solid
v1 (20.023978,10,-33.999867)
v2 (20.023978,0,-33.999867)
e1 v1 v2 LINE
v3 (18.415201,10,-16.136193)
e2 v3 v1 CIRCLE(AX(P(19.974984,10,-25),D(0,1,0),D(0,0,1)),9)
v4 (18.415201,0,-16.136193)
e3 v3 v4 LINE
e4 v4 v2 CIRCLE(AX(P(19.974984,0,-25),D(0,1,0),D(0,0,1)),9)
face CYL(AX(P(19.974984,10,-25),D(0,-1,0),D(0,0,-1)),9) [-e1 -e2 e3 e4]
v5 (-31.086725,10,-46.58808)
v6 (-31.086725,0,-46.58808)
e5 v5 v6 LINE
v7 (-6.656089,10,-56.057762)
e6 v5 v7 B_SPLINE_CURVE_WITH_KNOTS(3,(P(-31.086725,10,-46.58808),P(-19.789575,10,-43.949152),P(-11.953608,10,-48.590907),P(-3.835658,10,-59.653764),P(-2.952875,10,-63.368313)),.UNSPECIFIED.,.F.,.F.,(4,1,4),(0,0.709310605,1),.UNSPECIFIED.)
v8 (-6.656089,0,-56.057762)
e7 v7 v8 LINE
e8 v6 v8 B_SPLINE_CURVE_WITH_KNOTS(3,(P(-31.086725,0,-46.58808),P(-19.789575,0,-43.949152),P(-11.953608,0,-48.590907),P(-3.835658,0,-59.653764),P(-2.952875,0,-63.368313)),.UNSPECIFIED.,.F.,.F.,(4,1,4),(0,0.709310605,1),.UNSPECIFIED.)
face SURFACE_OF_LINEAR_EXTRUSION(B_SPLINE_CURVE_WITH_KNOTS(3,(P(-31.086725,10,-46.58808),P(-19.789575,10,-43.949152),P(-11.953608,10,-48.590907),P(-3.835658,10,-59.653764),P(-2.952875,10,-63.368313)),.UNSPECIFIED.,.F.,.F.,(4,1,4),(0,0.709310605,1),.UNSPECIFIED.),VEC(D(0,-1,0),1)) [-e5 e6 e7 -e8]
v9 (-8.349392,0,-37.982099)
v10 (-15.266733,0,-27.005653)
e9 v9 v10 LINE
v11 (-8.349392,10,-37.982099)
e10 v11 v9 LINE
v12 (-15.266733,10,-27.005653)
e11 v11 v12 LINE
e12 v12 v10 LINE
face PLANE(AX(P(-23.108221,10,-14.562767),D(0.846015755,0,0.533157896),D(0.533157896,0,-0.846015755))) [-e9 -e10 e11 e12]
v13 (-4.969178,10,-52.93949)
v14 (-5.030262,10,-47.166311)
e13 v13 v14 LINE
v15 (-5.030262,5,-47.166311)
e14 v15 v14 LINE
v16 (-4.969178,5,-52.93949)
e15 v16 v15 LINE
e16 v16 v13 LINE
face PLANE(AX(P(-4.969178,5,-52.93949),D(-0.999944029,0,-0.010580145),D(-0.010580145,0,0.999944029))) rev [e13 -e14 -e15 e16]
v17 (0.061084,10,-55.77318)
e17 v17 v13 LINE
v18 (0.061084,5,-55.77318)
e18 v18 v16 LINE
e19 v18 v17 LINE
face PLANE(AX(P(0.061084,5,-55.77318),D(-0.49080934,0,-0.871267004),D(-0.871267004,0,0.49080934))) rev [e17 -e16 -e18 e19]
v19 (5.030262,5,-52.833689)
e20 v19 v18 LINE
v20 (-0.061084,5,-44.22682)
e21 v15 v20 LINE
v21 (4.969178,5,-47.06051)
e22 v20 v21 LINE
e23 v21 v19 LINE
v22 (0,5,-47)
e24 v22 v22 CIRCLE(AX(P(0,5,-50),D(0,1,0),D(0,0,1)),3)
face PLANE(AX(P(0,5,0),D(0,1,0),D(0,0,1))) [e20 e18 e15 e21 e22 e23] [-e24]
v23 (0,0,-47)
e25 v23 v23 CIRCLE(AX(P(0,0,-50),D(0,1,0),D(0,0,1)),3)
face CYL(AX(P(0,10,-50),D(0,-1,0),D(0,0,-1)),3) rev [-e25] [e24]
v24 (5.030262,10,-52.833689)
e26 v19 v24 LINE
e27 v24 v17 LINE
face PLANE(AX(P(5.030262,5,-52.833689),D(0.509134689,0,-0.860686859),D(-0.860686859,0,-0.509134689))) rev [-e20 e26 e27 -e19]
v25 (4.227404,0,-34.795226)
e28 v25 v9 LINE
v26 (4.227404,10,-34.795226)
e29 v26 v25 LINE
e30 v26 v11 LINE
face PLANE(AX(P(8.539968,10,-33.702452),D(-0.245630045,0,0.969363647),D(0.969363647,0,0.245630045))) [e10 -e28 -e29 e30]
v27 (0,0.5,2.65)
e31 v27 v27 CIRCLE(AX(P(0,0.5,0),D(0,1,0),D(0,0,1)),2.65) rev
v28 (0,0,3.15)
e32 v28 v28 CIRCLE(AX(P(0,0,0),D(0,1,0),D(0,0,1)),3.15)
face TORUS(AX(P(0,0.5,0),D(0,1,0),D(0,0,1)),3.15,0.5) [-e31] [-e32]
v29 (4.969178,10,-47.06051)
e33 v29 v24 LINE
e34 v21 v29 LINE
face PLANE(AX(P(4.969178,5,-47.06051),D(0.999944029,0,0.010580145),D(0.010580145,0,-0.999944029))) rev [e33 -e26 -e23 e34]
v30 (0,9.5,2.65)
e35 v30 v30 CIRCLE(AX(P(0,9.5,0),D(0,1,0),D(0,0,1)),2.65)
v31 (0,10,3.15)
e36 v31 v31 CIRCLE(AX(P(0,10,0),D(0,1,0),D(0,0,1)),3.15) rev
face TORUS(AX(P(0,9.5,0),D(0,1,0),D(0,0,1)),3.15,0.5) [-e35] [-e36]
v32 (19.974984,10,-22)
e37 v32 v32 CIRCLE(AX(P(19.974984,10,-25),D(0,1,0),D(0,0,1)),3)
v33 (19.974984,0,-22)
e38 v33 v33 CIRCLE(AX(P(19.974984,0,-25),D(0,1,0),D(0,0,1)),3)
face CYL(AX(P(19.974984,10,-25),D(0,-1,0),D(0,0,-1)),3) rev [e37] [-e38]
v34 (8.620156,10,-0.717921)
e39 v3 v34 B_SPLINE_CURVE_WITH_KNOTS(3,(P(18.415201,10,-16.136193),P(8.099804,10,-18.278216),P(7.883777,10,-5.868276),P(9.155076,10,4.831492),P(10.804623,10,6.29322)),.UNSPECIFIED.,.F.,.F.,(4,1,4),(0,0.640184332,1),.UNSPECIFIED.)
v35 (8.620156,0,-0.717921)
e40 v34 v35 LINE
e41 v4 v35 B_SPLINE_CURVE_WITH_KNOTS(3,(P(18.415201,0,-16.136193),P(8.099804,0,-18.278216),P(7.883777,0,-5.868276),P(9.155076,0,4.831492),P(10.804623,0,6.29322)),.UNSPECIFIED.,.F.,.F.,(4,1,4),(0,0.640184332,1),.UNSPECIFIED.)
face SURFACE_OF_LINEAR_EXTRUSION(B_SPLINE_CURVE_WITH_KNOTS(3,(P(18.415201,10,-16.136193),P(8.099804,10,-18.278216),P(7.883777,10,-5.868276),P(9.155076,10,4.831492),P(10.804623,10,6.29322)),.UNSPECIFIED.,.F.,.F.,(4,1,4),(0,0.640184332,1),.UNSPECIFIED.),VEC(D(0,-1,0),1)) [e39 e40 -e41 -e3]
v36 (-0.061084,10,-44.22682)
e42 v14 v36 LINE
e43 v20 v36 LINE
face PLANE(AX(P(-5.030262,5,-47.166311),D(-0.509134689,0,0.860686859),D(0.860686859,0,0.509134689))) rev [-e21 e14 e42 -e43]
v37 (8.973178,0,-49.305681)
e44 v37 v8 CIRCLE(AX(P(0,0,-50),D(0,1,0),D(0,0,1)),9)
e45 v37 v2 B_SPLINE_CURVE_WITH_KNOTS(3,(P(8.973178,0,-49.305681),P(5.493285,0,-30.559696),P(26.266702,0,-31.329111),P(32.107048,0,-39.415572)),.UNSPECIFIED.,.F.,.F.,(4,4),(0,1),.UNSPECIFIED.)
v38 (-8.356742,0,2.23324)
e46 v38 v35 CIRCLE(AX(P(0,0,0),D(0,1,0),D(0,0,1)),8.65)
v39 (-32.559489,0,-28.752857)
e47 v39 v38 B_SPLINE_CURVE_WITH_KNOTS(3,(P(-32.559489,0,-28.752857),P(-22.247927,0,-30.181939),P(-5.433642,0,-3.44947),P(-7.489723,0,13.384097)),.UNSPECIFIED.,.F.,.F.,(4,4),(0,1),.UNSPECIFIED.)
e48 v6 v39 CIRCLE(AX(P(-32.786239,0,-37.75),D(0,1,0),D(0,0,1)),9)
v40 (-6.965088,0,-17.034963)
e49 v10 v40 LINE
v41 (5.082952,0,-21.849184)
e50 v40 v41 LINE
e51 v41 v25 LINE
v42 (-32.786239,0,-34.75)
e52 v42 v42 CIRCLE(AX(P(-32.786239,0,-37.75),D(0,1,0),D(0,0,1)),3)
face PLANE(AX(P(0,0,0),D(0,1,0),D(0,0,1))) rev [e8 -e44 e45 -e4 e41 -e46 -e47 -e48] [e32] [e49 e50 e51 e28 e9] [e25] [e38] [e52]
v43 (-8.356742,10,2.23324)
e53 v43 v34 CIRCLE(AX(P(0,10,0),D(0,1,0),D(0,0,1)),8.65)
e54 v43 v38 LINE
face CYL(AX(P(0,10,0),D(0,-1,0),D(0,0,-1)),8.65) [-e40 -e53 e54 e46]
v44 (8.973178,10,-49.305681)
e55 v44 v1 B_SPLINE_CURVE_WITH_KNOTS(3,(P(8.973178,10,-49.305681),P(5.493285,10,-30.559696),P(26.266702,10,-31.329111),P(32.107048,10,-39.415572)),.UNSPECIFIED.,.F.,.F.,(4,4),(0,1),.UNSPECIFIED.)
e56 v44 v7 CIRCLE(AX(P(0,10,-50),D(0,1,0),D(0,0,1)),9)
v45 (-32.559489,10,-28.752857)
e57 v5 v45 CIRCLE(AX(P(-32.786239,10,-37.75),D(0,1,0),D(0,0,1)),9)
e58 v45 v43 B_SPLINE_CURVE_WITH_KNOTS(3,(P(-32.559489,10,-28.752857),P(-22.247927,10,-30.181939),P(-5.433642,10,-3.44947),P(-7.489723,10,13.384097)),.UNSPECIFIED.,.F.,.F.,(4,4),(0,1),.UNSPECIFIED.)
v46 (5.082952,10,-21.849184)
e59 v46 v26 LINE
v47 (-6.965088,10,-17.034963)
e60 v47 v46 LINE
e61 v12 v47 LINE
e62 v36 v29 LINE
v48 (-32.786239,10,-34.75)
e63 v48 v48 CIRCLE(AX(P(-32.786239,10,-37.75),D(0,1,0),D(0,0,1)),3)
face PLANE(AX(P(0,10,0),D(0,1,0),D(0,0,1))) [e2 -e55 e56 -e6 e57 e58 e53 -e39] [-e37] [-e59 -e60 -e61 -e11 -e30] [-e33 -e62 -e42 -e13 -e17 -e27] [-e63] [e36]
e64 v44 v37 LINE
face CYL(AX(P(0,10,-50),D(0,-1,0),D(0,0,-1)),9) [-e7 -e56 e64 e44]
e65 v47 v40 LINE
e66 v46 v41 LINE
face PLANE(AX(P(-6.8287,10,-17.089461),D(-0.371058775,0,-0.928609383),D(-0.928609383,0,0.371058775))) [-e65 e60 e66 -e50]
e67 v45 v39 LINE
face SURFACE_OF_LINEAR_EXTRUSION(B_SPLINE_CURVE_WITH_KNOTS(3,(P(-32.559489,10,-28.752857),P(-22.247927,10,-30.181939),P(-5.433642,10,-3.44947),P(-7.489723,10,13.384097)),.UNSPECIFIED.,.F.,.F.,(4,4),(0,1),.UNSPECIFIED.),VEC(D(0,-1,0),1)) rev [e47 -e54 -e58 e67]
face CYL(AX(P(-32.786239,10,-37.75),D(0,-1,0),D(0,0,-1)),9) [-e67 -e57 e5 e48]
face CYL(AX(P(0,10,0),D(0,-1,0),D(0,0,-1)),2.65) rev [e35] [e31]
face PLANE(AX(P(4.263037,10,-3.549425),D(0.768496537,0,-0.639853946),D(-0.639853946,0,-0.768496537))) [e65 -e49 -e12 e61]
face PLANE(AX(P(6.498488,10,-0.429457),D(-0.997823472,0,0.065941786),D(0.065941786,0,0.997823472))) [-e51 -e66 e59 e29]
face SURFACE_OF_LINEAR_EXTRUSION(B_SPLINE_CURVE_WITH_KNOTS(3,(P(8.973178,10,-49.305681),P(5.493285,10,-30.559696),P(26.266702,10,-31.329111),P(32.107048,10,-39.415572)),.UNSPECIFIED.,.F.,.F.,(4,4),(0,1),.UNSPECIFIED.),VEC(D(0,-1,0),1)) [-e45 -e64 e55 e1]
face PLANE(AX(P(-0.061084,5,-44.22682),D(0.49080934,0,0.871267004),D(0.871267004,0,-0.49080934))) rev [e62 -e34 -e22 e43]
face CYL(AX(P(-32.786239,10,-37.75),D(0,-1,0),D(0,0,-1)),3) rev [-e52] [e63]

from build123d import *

# Parameters (mm, degrees)
EXTRUDE_1_OUTLINE_R   = 2.65
EXTRUDE_1_OUTLINE_R_2 = 3
EXTRUDE_1_DEPTH       = 10
CUT_EXTRUDE_1_DEPTH   = 5
FILLET_2_R            = 0.5
FILLET_3_R            = 0.5


# Read off the part's stored shape, not the designer's step: Бобышка-Вытянуть1
with BuildPart() as part:
    # Бобышка-Вытянуть1 outline → Бобышка-Вытянуть1 (new body)
    with BuildSketch(Plane(origin=(0, 0, 0), x_dir=(1, 0, 0), z_dir=(0, 1, 0))):
        with BuildLine():
            add(Edge.make_bspline(
                [(18.415201064, 16.136192912), (8.099804211, 18.278215903), (7.946140725, 9.450828153), (8.545020219, 1.48873653), (8.620156017, 0.717920777)],
                knots=[0, 0, 0, 0, 0.640184332, 0.711315924, 0.711315924, 0.711315924, 0.711315924], degree=3))
            ThreePointArc((18.415201064, 16.136192912), (28.93870742, 24.192739926), (20.02397796, 33.999866645))
            add(Edge.make_bspline(
                [(8.973177852, 49.305680737), (6.927050039, 38.283305713), (13.265956439, 34.007939827), (20.02397796, 33.999866645)],
                knots=[0, 0, 0, 0, 0.587985905, 0.587985905, 0.587985905, 0.587985905], degree=3))
            ThreePointArc((8.973177852, 49.305680737), (3.569296499, 58.26196844), (-6.656088527, 56.057762419))
            add(Edge.make_bspline(
                [(-31.086724645, 46.588079502), (-19.789574651, 43.949152129), (-13.613870041, 47.607425407), (-7.2630146, 55.254087082), (-6.656088527, 56.057762419)],
                knots=[0, 0, 0, 0, 0.709310605, 0.788122895, 0.788122895, 0.788122895, 0.788122895], degree=3))
            ThreePointArc((-31.086724645, 46.588079502), (-41.755710839, 38.490664399), (-32.559488638, 28.752856895))
            add(Edge.make_bspline(
                [(-32.559488638, 28.752856895), (-24.340075334, 29.891987935), (-11.988968241, 13.137863403), (-8.356742025, -2.233240408)],
                knots=[0, 0, 0, 0, 0.797106576, 0.797106576, 0.797106576, 0.797106576], degree=3))
            ThreePointArc((-8.356742025, -2.233240408), (1.481446867, -8.522195444), (8.620156017, 0.717920777))
        make_face()
        Circle(EXTRUDE_1_OUTLINE_R, mode=Mode.SUBTRACT)
        with Locations((19.974984355, 25)):
            Circle(EXTRUDE_1_OUTLINE_R_2, mode=Mode.SUBTRACT)
        with Locations((-32.786239492, 37.75)):
            Circle(EXTRUDE_1_OUTLINE_R_2, mode=Mode.SUBTRACT)
        Polygon((-8.349392166, 37.982099134), (4.227404243, 34.795225893), (5.082951506, 21.849183724), (-6.965087616, 17.034962885), (-15.266732554, 27.005652946), align=None, mode=Mode.SUBTRACT)
        with Locations((0, 50)):
            Circle(EXTRUDE_1_OUTLINE_R_2, mode=Mode.SUBTRACT)
    extrude(amount=EXTRUDE_1_DEPTH)

    # Эскиз2 → Вырез-Вытянуть1 (cut)
    with BuildSketch(Plane(origin=(0, 10, 0), x_dir=(1, 0, 0), z_dir=(0, 1, 0))):
        Polygon((5.030262391, 52.833689046), (0.061084495, 55.773179541), (-4.969177896, 52.939490495), (-5.030262391, 47.166310954), (-0.061084495, 44.226820459), (4.969177896, 47.060509505), align=None)
    extrude(amount=-CUT_EXTRUDE_1_DEPTH, mode=Mode.SUBTRACT)

    # Скругление2
    fillet_2_edges = [part.edges().sort_by_distance(p)[0] for p in [
        (-2.65, 0, 0),
    ]]
    fillet(fillet_2_edges, radius=FILLET_2_R)

    # Скругление3
    fillet_3_edges = [part.edges().sort_by_distance(p)[0] for p in [
        (-2.65, 10, 0),
    ]]
    fillet(fillet_3_edges, radius=FILLET_3_R)


solid = part.part
